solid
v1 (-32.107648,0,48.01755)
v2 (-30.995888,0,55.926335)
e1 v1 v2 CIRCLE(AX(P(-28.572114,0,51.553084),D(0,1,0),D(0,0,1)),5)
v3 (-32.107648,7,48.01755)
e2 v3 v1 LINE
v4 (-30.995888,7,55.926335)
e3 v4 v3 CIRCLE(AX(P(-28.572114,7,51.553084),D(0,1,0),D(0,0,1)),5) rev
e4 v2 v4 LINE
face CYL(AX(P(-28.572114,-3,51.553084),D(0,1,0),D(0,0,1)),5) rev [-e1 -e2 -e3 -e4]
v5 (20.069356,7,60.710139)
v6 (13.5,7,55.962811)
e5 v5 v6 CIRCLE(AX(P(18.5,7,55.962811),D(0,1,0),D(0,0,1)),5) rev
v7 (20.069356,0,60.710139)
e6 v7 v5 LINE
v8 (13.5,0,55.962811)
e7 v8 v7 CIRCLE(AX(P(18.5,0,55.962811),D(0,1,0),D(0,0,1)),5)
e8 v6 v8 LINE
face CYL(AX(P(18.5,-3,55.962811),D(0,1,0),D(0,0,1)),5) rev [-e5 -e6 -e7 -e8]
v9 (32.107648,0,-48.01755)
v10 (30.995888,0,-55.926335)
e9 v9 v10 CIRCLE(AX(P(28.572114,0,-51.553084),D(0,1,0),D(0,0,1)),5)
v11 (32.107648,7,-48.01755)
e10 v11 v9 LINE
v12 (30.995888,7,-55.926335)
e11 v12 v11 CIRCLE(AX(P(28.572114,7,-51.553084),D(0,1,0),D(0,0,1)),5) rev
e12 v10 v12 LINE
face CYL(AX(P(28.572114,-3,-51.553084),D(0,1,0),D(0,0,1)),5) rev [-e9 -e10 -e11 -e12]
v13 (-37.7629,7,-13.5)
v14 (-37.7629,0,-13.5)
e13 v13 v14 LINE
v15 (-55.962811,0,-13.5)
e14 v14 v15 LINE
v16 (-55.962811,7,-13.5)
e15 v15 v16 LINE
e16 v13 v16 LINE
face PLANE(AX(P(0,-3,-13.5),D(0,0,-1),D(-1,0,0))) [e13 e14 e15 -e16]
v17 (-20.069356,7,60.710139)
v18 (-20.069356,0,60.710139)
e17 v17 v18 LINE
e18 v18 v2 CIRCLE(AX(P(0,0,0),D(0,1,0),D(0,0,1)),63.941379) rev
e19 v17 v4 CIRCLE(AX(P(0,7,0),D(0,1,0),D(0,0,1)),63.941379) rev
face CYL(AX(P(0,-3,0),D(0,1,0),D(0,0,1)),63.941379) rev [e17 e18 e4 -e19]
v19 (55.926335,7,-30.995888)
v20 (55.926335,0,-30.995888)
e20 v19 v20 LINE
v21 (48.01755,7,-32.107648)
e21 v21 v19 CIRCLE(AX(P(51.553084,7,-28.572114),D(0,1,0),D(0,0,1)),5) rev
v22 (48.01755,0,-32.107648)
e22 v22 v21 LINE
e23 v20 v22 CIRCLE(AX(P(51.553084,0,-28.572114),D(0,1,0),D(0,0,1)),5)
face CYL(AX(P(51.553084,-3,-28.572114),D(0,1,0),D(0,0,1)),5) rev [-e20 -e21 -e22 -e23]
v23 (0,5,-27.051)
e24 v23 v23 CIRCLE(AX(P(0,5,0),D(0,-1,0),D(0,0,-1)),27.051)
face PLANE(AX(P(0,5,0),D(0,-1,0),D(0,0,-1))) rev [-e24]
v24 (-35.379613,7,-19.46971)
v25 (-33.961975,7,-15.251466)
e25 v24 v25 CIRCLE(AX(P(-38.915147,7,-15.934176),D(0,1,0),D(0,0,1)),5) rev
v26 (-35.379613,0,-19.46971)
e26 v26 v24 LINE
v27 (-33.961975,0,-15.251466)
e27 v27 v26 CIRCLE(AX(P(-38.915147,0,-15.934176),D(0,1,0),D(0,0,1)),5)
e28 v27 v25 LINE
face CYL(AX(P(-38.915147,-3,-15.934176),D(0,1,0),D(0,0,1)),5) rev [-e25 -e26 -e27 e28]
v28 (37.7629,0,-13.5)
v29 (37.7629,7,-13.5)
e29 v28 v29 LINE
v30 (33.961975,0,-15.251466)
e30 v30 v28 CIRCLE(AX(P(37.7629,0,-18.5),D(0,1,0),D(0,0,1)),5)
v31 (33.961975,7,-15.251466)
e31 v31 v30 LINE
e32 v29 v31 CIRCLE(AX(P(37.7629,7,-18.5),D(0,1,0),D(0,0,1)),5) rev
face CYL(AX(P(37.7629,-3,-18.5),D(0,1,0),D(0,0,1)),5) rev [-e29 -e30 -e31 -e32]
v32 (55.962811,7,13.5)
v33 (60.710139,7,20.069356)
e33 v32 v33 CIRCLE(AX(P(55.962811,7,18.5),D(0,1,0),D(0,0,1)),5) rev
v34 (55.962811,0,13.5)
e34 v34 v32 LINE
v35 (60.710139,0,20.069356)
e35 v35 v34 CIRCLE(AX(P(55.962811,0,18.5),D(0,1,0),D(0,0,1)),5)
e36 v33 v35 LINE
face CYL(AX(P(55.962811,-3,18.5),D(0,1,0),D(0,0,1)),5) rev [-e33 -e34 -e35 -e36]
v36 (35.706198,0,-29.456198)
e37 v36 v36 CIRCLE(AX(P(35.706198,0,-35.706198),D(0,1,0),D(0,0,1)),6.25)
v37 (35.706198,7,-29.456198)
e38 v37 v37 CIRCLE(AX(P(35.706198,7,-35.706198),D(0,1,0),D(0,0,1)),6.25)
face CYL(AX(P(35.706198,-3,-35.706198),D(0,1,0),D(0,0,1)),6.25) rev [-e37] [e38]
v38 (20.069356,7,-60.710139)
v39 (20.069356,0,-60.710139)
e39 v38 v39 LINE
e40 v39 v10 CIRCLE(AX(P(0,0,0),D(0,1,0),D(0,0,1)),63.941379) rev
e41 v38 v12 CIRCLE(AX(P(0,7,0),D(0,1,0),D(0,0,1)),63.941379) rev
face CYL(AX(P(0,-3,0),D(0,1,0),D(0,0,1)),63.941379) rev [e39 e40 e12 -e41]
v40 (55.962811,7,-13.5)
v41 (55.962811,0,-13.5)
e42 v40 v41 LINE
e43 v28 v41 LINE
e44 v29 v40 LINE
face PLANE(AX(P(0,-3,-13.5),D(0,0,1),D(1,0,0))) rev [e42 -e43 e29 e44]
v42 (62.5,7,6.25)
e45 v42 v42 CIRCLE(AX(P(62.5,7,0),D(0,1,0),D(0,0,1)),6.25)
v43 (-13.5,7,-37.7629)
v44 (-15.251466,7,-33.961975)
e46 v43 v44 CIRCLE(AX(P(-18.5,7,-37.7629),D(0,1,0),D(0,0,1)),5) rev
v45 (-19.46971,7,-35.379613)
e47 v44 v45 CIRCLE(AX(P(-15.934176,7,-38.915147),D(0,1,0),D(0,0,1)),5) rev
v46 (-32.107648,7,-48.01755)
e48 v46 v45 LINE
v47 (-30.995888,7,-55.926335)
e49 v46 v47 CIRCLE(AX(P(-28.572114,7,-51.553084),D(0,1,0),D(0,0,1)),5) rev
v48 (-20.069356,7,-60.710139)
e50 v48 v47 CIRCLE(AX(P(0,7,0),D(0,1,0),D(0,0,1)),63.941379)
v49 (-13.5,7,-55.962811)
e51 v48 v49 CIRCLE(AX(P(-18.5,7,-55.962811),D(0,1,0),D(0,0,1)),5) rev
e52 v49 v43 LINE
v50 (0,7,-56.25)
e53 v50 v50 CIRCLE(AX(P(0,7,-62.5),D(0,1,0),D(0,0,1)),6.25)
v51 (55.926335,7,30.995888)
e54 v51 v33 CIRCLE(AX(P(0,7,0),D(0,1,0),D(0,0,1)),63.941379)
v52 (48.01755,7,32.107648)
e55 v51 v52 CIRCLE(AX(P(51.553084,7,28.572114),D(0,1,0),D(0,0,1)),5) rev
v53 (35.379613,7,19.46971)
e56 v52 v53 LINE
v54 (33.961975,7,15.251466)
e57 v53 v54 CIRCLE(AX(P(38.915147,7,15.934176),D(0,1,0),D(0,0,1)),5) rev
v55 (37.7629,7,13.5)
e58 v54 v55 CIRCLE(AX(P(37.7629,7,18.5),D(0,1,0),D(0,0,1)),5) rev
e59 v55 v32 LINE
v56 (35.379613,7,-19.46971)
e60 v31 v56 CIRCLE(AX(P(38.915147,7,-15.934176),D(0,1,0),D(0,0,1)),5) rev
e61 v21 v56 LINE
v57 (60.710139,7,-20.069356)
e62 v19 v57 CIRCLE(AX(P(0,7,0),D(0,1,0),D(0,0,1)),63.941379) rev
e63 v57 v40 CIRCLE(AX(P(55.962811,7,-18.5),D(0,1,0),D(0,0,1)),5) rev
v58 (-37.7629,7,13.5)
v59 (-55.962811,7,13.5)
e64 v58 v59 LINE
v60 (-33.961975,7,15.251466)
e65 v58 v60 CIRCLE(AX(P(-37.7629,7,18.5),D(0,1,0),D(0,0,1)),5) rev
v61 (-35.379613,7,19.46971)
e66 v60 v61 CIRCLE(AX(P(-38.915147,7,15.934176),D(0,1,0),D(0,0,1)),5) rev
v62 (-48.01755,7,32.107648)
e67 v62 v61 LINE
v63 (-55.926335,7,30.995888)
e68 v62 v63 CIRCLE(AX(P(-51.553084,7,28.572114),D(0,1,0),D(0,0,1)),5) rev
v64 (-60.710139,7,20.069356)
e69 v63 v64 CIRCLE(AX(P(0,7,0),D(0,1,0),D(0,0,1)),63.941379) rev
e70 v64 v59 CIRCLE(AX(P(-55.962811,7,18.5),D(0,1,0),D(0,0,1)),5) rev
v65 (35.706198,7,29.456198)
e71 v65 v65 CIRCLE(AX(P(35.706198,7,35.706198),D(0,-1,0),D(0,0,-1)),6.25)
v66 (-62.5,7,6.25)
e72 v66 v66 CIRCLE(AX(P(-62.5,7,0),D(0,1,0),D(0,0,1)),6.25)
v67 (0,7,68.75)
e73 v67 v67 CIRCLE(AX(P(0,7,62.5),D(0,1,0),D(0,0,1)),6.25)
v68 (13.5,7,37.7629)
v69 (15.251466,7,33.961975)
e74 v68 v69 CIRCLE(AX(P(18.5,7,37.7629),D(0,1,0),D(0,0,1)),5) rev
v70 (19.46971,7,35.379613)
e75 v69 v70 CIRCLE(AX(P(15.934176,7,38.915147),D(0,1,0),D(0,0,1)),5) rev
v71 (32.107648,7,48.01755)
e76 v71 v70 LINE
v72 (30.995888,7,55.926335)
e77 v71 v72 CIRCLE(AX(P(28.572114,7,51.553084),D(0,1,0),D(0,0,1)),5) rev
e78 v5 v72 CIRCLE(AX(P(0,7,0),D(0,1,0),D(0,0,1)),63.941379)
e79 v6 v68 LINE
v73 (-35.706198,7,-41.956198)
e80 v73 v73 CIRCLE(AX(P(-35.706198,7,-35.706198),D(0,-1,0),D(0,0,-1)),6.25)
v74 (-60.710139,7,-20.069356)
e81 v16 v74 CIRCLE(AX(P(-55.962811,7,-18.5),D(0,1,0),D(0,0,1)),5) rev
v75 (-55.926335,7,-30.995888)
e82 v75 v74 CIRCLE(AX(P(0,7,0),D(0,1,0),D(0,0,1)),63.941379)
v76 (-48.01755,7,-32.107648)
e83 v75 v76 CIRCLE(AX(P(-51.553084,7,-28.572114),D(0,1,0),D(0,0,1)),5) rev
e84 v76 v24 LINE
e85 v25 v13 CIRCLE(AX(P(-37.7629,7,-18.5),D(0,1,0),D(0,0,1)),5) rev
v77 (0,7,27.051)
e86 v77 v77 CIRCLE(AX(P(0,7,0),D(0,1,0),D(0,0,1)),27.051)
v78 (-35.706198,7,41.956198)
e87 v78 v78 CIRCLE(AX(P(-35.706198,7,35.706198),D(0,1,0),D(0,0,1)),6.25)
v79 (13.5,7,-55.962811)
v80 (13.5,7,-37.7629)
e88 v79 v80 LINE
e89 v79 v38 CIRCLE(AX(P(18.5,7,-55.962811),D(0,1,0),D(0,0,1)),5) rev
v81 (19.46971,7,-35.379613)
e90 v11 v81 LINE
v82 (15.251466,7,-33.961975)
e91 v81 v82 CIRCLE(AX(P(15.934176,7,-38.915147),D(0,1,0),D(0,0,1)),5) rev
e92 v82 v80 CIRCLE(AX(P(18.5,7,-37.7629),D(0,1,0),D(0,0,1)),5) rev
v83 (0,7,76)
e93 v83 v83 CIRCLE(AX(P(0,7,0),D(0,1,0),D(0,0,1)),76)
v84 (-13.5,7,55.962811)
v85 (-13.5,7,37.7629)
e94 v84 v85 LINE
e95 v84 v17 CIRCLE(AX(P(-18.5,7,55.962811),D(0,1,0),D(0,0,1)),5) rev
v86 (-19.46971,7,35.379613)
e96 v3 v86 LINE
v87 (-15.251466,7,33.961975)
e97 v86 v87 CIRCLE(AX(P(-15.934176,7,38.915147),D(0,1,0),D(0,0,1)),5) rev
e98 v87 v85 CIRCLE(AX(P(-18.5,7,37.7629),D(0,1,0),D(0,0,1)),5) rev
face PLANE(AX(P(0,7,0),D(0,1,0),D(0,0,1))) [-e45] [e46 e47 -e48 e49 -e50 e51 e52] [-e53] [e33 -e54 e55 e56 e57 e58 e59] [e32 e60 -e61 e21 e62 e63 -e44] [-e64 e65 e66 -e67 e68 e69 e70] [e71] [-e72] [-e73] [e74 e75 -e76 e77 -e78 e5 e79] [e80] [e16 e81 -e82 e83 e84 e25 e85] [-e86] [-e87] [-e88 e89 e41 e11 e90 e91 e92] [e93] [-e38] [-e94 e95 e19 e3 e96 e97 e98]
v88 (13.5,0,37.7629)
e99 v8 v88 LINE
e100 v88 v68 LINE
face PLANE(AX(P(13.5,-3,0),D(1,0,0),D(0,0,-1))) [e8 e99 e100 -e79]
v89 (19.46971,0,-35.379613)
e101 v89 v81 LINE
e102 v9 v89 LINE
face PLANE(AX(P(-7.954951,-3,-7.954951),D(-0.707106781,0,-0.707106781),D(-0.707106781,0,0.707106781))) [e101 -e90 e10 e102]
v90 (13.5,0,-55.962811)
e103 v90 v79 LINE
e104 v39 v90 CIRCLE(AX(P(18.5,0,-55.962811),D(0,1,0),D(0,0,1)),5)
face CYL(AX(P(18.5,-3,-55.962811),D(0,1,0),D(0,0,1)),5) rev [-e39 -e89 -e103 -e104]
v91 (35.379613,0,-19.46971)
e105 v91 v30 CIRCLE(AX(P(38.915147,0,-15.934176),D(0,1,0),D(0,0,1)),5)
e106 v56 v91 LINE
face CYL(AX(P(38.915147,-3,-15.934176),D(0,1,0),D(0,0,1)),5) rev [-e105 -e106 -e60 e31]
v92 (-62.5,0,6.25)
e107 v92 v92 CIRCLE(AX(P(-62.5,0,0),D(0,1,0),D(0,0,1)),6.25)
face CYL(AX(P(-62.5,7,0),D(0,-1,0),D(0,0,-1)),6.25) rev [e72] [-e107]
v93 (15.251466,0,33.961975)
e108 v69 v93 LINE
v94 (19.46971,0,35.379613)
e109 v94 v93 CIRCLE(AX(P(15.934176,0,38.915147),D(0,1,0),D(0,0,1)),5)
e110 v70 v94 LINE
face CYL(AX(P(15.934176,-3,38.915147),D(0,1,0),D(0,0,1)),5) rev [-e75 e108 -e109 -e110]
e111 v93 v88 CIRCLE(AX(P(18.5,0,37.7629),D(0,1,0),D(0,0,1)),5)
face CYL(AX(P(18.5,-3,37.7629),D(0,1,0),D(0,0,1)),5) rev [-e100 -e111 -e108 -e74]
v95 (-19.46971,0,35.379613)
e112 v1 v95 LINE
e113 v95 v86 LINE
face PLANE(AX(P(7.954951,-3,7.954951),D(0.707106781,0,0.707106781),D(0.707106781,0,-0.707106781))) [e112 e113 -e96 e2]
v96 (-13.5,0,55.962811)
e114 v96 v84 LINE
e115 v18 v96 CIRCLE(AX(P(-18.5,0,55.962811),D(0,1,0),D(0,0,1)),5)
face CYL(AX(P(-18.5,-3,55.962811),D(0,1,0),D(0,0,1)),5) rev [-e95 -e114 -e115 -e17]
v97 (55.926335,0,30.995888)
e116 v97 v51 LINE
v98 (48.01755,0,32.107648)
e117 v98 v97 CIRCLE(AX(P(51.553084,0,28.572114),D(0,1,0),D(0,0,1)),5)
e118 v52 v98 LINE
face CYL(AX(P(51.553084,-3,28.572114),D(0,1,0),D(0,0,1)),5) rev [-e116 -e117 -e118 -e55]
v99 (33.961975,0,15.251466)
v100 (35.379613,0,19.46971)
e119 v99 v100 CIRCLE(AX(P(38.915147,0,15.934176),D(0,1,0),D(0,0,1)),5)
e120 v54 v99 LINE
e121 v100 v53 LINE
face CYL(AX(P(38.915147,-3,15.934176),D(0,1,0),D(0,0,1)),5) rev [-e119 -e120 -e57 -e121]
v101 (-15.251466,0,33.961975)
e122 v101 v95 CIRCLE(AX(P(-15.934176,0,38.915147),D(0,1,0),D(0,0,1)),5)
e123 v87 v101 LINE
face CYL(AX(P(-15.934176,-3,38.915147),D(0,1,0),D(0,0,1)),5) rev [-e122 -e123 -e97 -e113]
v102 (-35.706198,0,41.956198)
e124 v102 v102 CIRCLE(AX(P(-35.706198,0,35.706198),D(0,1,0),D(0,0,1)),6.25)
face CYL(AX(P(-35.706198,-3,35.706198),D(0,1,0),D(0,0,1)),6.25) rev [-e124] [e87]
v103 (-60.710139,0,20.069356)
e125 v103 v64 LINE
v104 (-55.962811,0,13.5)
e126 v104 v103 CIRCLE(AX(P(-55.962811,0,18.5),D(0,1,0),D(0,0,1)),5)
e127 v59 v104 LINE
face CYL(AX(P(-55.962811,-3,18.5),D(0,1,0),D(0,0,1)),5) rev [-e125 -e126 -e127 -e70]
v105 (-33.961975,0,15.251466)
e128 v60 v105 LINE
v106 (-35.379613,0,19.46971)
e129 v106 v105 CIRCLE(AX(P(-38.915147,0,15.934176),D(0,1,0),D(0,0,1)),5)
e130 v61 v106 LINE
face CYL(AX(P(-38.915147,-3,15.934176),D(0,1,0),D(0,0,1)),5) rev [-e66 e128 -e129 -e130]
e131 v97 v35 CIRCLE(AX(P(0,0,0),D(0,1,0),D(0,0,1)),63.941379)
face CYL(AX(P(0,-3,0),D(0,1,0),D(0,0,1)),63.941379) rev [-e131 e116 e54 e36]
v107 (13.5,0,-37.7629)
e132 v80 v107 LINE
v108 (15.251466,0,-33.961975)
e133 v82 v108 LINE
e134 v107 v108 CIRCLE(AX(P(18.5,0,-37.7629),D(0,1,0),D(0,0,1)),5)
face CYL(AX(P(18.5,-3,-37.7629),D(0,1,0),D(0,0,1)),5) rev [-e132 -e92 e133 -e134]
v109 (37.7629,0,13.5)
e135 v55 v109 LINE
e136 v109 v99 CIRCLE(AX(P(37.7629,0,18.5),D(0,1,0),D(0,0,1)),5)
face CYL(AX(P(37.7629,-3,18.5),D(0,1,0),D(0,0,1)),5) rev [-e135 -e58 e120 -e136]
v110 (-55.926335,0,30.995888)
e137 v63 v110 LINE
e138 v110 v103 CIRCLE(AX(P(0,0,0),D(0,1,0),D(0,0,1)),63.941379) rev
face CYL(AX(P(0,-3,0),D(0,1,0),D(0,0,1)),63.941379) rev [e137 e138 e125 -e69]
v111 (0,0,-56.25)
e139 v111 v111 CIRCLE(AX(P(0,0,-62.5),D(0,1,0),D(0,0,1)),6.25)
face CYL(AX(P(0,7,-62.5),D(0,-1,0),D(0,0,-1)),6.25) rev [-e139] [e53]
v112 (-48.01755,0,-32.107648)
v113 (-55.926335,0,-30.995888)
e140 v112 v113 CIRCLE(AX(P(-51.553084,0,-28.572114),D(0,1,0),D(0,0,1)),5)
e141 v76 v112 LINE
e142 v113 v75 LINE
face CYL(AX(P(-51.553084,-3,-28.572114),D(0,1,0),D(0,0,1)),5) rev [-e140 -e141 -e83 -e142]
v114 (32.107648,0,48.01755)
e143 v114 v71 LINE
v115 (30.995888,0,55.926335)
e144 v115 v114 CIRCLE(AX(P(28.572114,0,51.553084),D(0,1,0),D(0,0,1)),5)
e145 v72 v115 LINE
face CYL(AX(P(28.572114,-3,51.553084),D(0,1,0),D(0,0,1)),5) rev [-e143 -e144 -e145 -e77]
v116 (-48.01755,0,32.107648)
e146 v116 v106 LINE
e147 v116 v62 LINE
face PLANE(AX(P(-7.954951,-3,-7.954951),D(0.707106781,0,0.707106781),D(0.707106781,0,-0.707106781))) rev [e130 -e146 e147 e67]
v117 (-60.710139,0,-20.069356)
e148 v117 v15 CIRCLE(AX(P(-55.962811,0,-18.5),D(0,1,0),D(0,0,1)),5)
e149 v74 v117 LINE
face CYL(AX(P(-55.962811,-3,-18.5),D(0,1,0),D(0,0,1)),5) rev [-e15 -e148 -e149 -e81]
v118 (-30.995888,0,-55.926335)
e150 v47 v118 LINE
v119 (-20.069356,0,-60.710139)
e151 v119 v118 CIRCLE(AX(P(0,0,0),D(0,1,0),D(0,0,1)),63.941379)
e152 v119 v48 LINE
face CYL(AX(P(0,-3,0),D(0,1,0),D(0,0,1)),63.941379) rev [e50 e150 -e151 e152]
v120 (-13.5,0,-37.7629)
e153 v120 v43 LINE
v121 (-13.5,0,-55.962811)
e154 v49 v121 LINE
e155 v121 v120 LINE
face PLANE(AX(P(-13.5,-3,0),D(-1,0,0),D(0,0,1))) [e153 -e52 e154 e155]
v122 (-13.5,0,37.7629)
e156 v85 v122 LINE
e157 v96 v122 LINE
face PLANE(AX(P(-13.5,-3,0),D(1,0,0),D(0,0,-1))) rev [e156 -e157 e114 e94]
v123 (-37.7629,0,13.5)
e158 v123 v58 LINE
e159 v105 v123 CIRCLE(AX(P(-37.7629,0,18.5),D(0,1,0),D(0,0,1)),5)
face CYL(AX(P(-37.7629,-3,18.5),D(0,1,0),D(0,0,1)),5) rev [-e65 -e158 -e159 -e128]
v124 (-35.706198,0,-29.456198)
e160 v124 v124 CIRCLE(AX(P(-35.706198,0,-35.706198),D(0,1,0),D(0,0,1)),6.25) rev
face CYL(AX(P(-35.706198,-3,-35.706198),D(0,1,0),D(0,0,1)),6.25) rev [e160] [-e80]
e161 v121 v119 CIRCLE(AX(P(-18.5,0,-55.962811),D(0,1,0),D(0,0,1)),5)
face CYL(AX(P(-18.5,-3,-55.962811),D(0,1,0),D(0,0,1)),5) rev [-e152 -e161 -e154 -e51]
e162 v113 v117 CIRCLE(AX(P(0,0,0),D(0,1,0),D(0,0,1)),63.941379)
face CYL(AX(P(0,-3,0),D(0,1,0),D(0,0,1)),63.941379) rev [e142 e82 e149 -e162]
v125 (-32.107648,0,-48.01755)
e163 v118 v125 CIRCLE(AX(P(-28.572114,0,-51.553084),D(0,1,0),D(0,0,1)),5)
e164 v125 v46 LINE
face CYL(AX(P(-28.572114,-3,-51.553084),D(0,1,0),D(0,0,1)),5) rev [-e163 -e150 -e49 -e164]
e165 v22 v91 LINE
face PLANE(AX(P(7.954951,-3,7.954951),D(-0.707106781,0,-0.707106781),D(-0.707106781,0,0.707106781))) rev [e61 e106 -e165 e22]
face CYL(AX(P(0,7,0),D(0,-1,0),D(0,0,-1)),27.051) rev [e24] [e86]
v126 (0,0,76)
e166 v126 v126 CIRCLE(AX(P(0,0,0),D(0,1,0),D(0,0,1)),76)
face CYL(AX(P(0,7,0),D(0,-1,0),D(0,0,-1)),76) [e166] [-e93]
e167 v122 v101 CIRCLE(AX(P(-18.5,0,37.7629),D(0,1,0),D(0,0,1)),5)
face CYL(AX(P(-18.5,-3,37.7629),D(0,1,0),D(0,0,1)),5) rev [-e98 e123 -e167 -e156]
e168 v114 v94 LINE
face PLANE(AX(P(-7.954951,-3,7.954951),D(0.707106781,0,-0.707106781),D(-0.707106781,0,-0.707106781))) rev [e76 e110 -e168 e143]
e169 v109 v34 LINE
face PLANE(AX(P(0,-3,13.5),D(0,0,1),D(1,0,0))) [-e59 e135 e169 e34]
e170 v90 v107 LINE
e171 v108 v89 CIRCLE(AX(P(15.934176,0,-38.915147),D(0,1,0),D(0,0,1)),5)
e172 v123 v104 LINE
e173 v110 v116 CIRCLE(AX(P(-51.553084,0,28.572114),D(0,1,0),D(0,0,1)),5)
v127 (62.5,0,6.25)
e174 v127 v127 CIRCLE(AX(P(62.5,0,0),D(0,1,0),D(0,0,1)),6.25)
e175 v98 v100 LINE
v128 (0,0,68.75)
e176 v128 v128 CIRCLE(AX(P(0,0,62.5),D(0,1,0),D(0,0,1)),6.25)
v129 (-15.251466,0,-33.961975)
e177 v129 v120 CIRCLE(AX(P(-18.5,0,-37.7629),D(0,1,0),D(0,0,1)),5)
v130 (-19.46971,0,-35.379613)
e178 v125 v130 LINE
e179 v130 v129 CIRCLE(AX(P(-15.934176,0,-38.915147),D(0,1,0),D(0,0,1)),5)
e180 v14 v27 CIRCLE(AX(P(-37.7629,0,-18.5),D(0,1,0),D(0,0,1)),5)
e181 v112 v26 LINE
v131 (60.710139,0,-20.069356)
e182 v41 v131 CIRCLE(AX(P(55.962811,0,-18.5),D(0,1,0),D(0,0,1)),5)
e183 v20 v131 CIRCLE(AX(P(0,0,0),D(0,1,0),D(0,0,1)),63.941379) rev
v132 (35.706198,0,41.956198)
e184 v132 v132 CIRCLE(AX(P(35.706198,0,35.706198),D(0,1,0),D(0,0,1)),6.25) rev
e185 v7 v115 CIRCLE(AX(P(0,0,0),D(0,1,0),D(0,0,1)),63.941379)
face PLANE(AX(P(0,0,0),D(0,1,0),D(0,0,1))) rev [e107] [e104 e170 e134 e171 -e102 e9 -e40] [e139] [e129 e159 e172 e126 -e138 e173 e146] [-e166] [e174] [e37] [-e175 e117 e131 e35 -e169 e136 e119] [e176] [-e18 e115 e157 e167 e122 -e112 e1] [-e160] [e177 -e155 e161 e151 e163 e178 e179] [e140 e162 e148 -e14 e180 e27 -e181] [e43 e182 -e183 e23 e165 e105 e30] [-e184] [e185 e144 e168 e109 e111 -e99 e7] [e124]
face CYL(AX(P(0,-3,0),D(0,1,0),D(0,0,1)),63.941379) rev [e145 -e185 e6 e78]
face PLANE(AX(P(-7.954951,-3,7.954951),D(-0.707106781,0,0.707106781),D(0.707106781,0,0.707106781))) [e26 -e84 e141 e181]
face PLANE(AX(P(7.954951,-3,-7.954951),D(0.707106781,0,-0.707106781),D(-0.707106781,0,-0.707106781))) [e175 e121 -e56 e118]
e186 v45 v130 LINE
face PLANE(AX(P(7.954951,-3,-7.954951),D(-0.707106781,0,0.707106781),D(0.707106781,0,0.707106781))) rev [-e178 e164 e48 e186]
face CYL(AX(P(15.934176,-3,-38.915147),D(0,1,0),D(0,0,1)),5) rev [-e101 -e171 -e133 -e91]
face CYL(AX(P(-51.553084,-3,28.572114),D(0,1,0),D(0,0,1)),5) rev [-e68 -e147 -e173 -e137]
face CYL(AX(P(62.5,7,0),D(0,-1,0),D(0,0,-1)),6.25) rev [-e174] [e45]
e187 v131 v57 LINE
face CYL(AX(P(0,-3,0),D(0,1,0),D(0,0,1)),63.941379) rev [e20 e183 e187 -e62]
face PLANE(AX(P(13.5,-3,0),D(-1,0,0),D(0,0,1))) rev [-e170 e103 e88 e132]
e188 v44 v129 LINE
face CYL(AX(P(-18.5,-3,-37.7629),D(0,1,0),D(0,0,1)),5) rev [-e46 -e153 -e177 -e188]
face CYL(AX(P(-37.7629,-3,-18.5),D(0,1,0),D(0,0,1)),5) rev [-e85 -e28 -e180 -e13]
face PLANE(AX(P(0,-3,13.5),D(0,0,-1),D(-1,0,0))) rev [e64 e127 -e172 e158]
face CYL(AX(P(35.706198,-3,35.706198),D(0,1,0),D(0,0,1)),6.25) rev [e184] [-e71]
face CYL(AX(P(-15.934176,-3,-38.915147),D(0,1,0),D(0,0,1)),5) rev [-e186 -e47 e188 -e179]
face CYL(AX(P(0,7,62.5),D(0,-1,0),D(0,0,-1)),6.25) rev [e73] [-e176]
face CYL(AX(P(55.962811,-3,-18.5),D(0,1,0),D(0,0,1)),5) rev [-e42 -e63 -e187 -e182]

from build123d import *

# Parameters (mm, degrees)
SKETCH1_R           = 76
SKETCH1_R_2         = 27.051
SKETCH1_R_3         = 6.25
BOSS_EXTRUDE1_DEPTH = 7
SKETCH3_R           = 27.051
BOSS_EXTRUDE2_DEPTH = 5
SKETCH4_R           = 6.25
CUT_EXTRUDE1_DEPTH  = 10
FILLET1_R           = 5


with BuildPart() as part:
    # Sketch1 → Boss-Extrude1 (new body)
    with BuildSketch(Plane(origin=(0, 0, 0), x_dir=(1, 0, 0), z_dir=(0, 1, 0))):
        with Locations(Location((0, 0, 0), (0, 0, 270))):
            Circle(SKETCH1_R)
        with Locations(Location((0, 0, 0), (0, 0, 270))):
            Circle(SKETCH1_R_2, mode=Mode.SUBTRACT)
        with Locations(Location((0, 62.5, 0), (0, 0, 270))):
            Circle(SKETCH1_R_3, mode=Mode.SUBTRACT)
        with Locations(Location((62.5, 0, 0), (0, 0, 270))):
            Circle(SKETCH1_R_3, mode=Mode.SUBTRACT)
        with Locations(Location((0, -62.5, 0), (0, 0, 270))):
            Circle(SKETCH1_R_3, mode=Mode.SUBTRACT)
        with Locations(Location((-62.5, 0, 0), (0, 0, 270))):
            Circle(SKETCH1_R_3, mode=Mode.SUBTRACT)
    extrude(amount=BOSS_EXTRUDE1_DEPTH)

    # Sketch3 → Boss-Extrude2 (add)
    with BuildSketch(Plane.XZ):
        with Locations(Location((0, 0, 0), (0, 0, 270))):
            Circle(SKETCH3_R)
    extrude(amount=-BOSS_EXTRUDE2_DEPTH)

    # Sketch4 → Cut-Extrude1 (cut)
    with BuildSketch(Plane(origin=(0, 7, 0), x_dir=(1, 0, 0), z_dir=(0, 1, 0))):
        with BuildLine():
            Line((27.751246841, -43.661149418), (17.007161012, -32.917063589))
            ThreePointArc((17.007161012, -32.917063589), (15.274204293, -33.756114768), (13.5, -34.504008477))
            Line((13.5, -34.504008477), (13.5, -62.5))
            ThreePointArc((13.5, -62.5), (25.524772494, -58.625813335), (36.553123822, -52.463026398))
            Line((36.553123822, -52.463026398), (27.751246841, -43.661149418))
        make_face()
        with BuildLine():
            Line((62.5, -13.5), (34.504008477, -13.5))
            ThreePointArc((34.504008477, -13.5), (33.756114768, -15.274204293), (32.917063589, -17.007161012))
            Line((32.917063589, -17.007161012), (43.66114941, -27.751246833))
            Line((43.66114941, -27.751246833), (52.463026398, -36.553123822))
            ThreePointArc((52.463026398, -36.553123822), (58.625813335, -25.524772494), (62.5, -13.5))
        make_face()
        with BuildLine():
            ThreePointArc((-13.5, -34.504008477), (-15.274204293, -33.756114768), (-17.007161012, -32.917063589))
            Line((-17.007161012, -32.917063589), (-27.751246874, -43.66114945))
            Line((-27.751246874, -43.66114945), (-36.553123822, -52.463026398))
            ThreePointArc((-36.553123822, -52.463026398), (-25.524772494, -58.625813335), (-13.5, -62.5))
            Line((-13.5, -62.5), (-13.5, -34.504008477))
        make_face()
        with BuildLine():
            ThreePointArc((-32.917063589, -17.007161012), (-33.756114768, -15.274204293), (-34.504008477, -13.5))
            Line((-34.504008477, -13.5), (-62.5, -13.5))
            ThreePointArc((-62.5, -13.5), (-58.625813335, -25.524772494), (-52.463026398, -36.553123822))
            Line((-52.463026398, -36.553123822), (-43.661149471, -27.751246894))
            Line((-43.661149471, -27.751246894), (-32.917063589, -17.007161012))
        make_face()
        with BuildLine():
            ThreePointArc((-34.504008477, 13.5), (-33.756114768, 15.274204293), (-32.917063589, 17.007161012))
            Line((-32.917063589, 17.007161012), (-43.66114943, 27.751246854))
            Line((-43.66114943, 27.751246854), (-52.463026398, 36.553123822))
            ThreePointArc((-52.463026398, 36.553123822), (-58.625813335, 25.524772494), (-62.5, 13.5))
            Line((-62.5, 13.5), (-34.504008477, 13.5))
        make_face()
        with BuildLine():
            ThreePointArc((-17.007161012, 32.917063589), (-15.274204293, 33.756114768), (-13.5, 34.504008477))
            Line((-13.5, 34.504008477), (-13.5, 62.5))
            ThreePointArc((-13.5, 62.5), (-25.524772494, 58.625813335), (-36.553123822, 52.463026398))
            Line((-36.553123822, 52.463026398), (-27.751246874, 43.66114945))
            Line((-27.751246874, 43.66114945), (-17.007161012, 32.917063589))
        make_face()
        with BuildLine():
            ThreePointArc((36.553123822, 52.463026398), (25.524772494, 58.625813335), (13.5, 62.5))
            Line((13.5, 62.5), (13.5, 34.504008477))
            ThreePointArc((13.5, 34.504008477), (15.274204293, 33.756114768), (17.007161012, 32.917063589))
            Line((17.007161012, 32.917063589), (27.751246906, 43.661149483))
            Line((27.751246906, 43.661149483), (36.553123822, 52.463026398))
        make_face()
        with BuildLine():
            ThreePointArc((62.5, 13.5), (58.625813335, 25.524772494), (52.463026398, 36.553123822))
            Line((52.463026398, 36.553123822), (43.66114945, 27.751246874))
            Line((43.66114945, 27.751246874), (32.917063589, 17.007161012))
            ThreePointArc((32.917063589, 17.007161012), (33.756114768, 15.274204293), (34.504008477, 13.5))
            Line((34.504008477, 13.5), (62.5, 13.5))
        make_face()
        with Locations(Location((35.706198162, 35.706198162, 0), (0, 0, 270))):
            Circle(SKETCH4_R)
        with Locations(Location((35.706198162, -35.706198162, 0), (0, 0, 270))):
            Circle(SKETCH4_R)
        with Locations(Location((-35.706198162, -35.706198162, 0), (0, 0, 270))):
            Circle(SKETCH4_R)
        with Locations(Location((-35.706198162, 35.706198162, 0), (0, 0, 270))):
            Circle(SKETCH4_R)
    extrude(amount=-CUT_EXTRUDE1_DEPTH, mode=Mode.SUBTRACT)

    # Fillet1
    # the kernel refuses this fillet: 5 mm, written as the material it adds along each edge
    with BuildSketch(Plane(origin=(34.504008477, 7, 13.5), x_dir=(1, 0, 0), z_dir=(0, -1, 0)), Plane(origin=(13.5, 7, -34.504008477), x_dir=(0, 0, -1), z_dir=(0, -1, 0)), Plane(origin=(-34.504008477, 7, -13.5), x_dir=(-1, 0, 0), z_dir=(0, -1, 0)), Plane(origin=(-13.5, 7, 34.504008477), x_dir=(0, 0, 1), z_dir=(0, -1, 0))) as fillet1_piece_1:
        with BuildLine():
            CenterArc((3.258891319, 5), FILLET1_R, 206.100178987, 63.899821013)
            ThreePointArc((-1.231239688, 2.800290124), (-0.586707725, 1.412857227), (0, 0))
            Line((0, 0), (3.258891319, 0))
        make_face()
    extrude(amount=7)
    with BuildSketch(Plane(origin=(62.5, 7, 13.5), x_dir=(-1, 0, 0), z_dir=(0, -1, 0))) as fillet1_piece_2:
        with BuildLine():
            CenterArc((6.537189081, -5), FILLET1_R, 90, 108.2926811)
            ThreePointArc((1.789861186, -6.569355874), (0.807426008, -3.308519097), (0, 0))
            Line((0, 0), (6.537189081, 0))
        make_face()
    extrude(amount=7)
    with BuildSketch(Plane(origin=(52.463026398, 7, 36.553123822), x_dir=(-0.7071067811865521, 0, -0.707106781186543), z_dir=(0, -1, 0)), Plane(origin=(-36.553123822, 7, 52.463026398), x_dir=(0.7071067811865515, 0, -0.7071067811865436), z_dir=(0, -1, 0))) as fillet1_piece_3:
        with BuildLine():
            CenterArc((6.286852353, 5), FILLET1_R, 163.996405934, 106.003594066)
            ThreePointArc((1.480630334, 6.378488268), (0.658610883, 3.208210045), (0, 0))
            Line((0, 0), (6.286852353, 0))
        make_face()
    extrude(amount=7)
    with BuildSketch(Plane(origin=(32.917063589, 7, 17.007161012), x_dir=(0.4193809358930841, 0, -0.907810349472532), z_dir=(0, -1, 0)), Plane(origin=(17.007161012, 7, -32.917063589), x_dir=(-0.9078103494725283, 0, -0.41938093589309267), z_dir=(0, -1, 0)), Plane(origin=(-32.917063589, 7, -17.007161012), x_dir=(-0.4193809358930852, 0, 0.9078103494725317), z_dir=(0, -1, 0))) as fillet1_piece_4:
        with BuildLine():
            CenterArc((3.489548398, 4.995132399), FILLET1_R, 200.204490443, 67.267112024)
            Line((-1.202781391, 3.268273647), (0, 0))
            ThreePointArc((0, 0), (1.634487847, 0.036069898), (3.268975694, 0))
        make_face()
    extrude(amount=7)
    with BuildSketch(Plane(origin=(32.917063589, 7, -17.007161012), x_dir=(0.7071067811865526, 0, -0.7071067811865425), z_dir=(0, -1, 0)), Plane(origin=(-17.007161012, 7, -32.917063589), x_dir=(-0.7071067811865506, 0, -0.7071067811865445), z_dir=(0, -1, 0)), Plane(origin=(-32.917063589, 7, 17.007161012), x_dir=(-0.7071067811865506, 0, 0.7071067811865445), z_dir=(0, -1, 0)), Plane(origin=(17.007161012, 7, 32.917063589), x_dir=(0.7071067811865501, 0, 0.707106781186545), z_dir=(0, -1, 0))) as fillet1_piece_5:
        with BuildLine():
            CenterArc((3.482570273, 5), FILLET1_R, 202.732887976, 67.267112024)
            ThreePointArc((-1.129011858, 3.067822406), (-0.530655558, 1.546368727), (0, 0))
            Line((0, 0), (3.482570273, 0))
        make_face()
    extrude(amount=7)
    with BuildSketch(Plane(origin=(34.504008477, 7, -13.5), x_dir=(1, 0, 0), z_dir=(0, -1, 0))) as fillet1_piece_6:
        with BuildLine():
            CenterArc((3.258891319, -5), FILLET1_R, 90, 63.899821013)
            ThreePointArc((-1.231239688, -2.800290124), (-0.586707725, -1.412857227), (0, 0))
            Line((0, 0), (3.258891319, 0))
        make_face()
    extrude(amount=7)
    with BuildSketch(Plane(origin=(62.5, 7, -13.5), x_dir=(-1, 0, 0), z_dir=(0, -1, 0)), Plane(origin=(-13.5, 7, -62.5), x_dir=(0, 0, 1), z_dir=(0, -1, 0)), Plane(origin=(-62.5, 7, 13.5), x_dir=(1, 0, 0), z_dir=(0, -1, 0)), Plane(origin=(13.5, 7, 62.5), x_dir=(0, 0, -1), z_dir=(0, -1, 0))) as fillet1_piece_7:
        with BuildLine():
            CenterArc((6.537189081, 5), FILLET1_R, 161.7073189, 108.2926811)
            ThreePointArc((1.789861186, 6.569355874), (0.807426008, 3.308519097), (0, 0))
            Line((0, 0), (6.537189081, 0))
        make_face()
    extrude(amount=7)
    with BuildSketch(Plane(origin=(52.463026398, 7, -36.553123822), x_dir=(0.5289042688396526, 0, 0.848681491728901), z_dir=(0, -1, 0))) as fillet1_piece_8:
        with BuildLine():
            CenterArc((6.292063112, 4.993441128), FILLET1_R, 166.931450544, 106.003594066)
            Line((1.421561948, 6.124024341), (0, 0))
            ThreePointArc((0, 0), (3.274041034, -0.08387667), (6.548082068, 0))
        make_face()
    extrude(amount=7)
    with BuildSketch(Plane(origin=(36.553123822, 7, -52.463026398), x_dir=(-0.8486814917288963, 0, -0.52890426883966), z_dir=(0, -1, 0)), Plane(origin=(-52.463026398, 7, -36.553123822), x_dir=(-0.5289042688396536, 0, 0.8486814917289003), z_dir=(0, -1, 0))) as fillet1_piece_9:
        with BuildLine():
            CenterArc((6.292063112, -4.993441128), FILLET1_R, 87.06495539, 106.003594066)
            Line((1.421561948, -6.124024341), (0, 0))
            ThreePointArc((0, 0), (3.274041034, 0.08387667), (6.548082068, 0))
        make_face()
    extrude(amount=7)
    with BuildSketch(Plane(origin=(13.5, 7, -62.5), x_dir=(0.9648302017860143, 0, 0.26287388938720957), z_dir=(0, -1, 0)), Plane(origin=(-62.5, 7, -13.5), x_dir=(0.2628738893872084, 0, -0.9648302017860146), z_dir=(0, -1, 0)), Plane(origin=(-13.5, 7, 62.5), x_dir=(-0.9648302017860145, 0, -0.26287388938720885), z_dir=(0, -1, 0))) as fillet1_piece_10:
        with BuildLine():
            CenterArc((6.542607328, 4.992908013), FILLET1_R, 164.759342849, 108.2926811)
            Line((1.718456319, 6.30727746), (0, 0))
            ThreePointArc((0, 0), (3.404410363, -0.090694285), (6.808820725, 0))
        make_face()
    extrude(amount=7)
    with BuildSketch(Plane(origin=(-36.553123822, 7, -52.463026398), x_dir=(0.707106781186552, 0, 0.7071067811865429), z_dir=(0, -1, 0)), Plane(origin=(-52.463026398, 7, 36.553123822), x_dir=(0.7071067811865515, 0, -0.7071067811865436), z_dir=(0, -1, 0)), Plane(origin=(36.553123822, 7, 52.463026398), x_dir=(-0.7071067811865527, 0, -0.7071067811865425), z_dir=(0, -1, 0))) as fillet1_piece_11:
        with BuildLine():
            CenterArc((6.286852353, -5), FILLET1_R, 90, 106.003594066)
            ThreePointArc((1.480630334, -6.378488268), (0.658610883, -3.208210045), (0, 0))
            Line((0, 0), (6.286852353, 0))
        make_face()
    extrude(amount=7)
    with BuildSketch(Plane(origin=(-13.5, 7, -34.504008477), x_dir=(-0.9154220062230544, 0, 0.4024954043496127), z_dir=(0, -1, 0)), Plane(origin=(-34.504008477, 7, 13.5), x_dir=(0.4024954043496181, 0, 0.915422006223052), z_dir=(0, -1, 0)), Plane(origin=(13.5, 7, 34.504008477), x_dir=(0.915422006223051, 0, -0.40249540434962), z_dir=(0, -1, 0))) as fillet1_piece_12:
        with BuildLine():
            CenterArc((3.265421252, 4.995737851), FILLET1_R, 203.734271223, 63.899821013)
            Line((-1.311688779, 2.983260829), (0, 0))
            ThreePointArc((0, 0), (1.52950776, 0.031583378), (3.059015519, 0))
        make_face()
    extrude(amount=7)
    with BuildSketch(Plane(origin=(-17.007161012, 7, 32.917063589), x_dir=(-0.7071067811865496, 0, 0.7071067811865455), z_dir=(0, -1, 0))) as fillet1_piece_13:
        with BuildLine():
            CenterArc((3.482570273, -5), FILLET1_R, 90, 67.267112024)
            ThreePointArc((-1.129011858, -3.067822406), (-0.530655558, -1.546368727), (0, 0))
            Line((0, 0), (3.482570273, 0))
        make_face()
    extrude(amount=7)


solid = part.part
